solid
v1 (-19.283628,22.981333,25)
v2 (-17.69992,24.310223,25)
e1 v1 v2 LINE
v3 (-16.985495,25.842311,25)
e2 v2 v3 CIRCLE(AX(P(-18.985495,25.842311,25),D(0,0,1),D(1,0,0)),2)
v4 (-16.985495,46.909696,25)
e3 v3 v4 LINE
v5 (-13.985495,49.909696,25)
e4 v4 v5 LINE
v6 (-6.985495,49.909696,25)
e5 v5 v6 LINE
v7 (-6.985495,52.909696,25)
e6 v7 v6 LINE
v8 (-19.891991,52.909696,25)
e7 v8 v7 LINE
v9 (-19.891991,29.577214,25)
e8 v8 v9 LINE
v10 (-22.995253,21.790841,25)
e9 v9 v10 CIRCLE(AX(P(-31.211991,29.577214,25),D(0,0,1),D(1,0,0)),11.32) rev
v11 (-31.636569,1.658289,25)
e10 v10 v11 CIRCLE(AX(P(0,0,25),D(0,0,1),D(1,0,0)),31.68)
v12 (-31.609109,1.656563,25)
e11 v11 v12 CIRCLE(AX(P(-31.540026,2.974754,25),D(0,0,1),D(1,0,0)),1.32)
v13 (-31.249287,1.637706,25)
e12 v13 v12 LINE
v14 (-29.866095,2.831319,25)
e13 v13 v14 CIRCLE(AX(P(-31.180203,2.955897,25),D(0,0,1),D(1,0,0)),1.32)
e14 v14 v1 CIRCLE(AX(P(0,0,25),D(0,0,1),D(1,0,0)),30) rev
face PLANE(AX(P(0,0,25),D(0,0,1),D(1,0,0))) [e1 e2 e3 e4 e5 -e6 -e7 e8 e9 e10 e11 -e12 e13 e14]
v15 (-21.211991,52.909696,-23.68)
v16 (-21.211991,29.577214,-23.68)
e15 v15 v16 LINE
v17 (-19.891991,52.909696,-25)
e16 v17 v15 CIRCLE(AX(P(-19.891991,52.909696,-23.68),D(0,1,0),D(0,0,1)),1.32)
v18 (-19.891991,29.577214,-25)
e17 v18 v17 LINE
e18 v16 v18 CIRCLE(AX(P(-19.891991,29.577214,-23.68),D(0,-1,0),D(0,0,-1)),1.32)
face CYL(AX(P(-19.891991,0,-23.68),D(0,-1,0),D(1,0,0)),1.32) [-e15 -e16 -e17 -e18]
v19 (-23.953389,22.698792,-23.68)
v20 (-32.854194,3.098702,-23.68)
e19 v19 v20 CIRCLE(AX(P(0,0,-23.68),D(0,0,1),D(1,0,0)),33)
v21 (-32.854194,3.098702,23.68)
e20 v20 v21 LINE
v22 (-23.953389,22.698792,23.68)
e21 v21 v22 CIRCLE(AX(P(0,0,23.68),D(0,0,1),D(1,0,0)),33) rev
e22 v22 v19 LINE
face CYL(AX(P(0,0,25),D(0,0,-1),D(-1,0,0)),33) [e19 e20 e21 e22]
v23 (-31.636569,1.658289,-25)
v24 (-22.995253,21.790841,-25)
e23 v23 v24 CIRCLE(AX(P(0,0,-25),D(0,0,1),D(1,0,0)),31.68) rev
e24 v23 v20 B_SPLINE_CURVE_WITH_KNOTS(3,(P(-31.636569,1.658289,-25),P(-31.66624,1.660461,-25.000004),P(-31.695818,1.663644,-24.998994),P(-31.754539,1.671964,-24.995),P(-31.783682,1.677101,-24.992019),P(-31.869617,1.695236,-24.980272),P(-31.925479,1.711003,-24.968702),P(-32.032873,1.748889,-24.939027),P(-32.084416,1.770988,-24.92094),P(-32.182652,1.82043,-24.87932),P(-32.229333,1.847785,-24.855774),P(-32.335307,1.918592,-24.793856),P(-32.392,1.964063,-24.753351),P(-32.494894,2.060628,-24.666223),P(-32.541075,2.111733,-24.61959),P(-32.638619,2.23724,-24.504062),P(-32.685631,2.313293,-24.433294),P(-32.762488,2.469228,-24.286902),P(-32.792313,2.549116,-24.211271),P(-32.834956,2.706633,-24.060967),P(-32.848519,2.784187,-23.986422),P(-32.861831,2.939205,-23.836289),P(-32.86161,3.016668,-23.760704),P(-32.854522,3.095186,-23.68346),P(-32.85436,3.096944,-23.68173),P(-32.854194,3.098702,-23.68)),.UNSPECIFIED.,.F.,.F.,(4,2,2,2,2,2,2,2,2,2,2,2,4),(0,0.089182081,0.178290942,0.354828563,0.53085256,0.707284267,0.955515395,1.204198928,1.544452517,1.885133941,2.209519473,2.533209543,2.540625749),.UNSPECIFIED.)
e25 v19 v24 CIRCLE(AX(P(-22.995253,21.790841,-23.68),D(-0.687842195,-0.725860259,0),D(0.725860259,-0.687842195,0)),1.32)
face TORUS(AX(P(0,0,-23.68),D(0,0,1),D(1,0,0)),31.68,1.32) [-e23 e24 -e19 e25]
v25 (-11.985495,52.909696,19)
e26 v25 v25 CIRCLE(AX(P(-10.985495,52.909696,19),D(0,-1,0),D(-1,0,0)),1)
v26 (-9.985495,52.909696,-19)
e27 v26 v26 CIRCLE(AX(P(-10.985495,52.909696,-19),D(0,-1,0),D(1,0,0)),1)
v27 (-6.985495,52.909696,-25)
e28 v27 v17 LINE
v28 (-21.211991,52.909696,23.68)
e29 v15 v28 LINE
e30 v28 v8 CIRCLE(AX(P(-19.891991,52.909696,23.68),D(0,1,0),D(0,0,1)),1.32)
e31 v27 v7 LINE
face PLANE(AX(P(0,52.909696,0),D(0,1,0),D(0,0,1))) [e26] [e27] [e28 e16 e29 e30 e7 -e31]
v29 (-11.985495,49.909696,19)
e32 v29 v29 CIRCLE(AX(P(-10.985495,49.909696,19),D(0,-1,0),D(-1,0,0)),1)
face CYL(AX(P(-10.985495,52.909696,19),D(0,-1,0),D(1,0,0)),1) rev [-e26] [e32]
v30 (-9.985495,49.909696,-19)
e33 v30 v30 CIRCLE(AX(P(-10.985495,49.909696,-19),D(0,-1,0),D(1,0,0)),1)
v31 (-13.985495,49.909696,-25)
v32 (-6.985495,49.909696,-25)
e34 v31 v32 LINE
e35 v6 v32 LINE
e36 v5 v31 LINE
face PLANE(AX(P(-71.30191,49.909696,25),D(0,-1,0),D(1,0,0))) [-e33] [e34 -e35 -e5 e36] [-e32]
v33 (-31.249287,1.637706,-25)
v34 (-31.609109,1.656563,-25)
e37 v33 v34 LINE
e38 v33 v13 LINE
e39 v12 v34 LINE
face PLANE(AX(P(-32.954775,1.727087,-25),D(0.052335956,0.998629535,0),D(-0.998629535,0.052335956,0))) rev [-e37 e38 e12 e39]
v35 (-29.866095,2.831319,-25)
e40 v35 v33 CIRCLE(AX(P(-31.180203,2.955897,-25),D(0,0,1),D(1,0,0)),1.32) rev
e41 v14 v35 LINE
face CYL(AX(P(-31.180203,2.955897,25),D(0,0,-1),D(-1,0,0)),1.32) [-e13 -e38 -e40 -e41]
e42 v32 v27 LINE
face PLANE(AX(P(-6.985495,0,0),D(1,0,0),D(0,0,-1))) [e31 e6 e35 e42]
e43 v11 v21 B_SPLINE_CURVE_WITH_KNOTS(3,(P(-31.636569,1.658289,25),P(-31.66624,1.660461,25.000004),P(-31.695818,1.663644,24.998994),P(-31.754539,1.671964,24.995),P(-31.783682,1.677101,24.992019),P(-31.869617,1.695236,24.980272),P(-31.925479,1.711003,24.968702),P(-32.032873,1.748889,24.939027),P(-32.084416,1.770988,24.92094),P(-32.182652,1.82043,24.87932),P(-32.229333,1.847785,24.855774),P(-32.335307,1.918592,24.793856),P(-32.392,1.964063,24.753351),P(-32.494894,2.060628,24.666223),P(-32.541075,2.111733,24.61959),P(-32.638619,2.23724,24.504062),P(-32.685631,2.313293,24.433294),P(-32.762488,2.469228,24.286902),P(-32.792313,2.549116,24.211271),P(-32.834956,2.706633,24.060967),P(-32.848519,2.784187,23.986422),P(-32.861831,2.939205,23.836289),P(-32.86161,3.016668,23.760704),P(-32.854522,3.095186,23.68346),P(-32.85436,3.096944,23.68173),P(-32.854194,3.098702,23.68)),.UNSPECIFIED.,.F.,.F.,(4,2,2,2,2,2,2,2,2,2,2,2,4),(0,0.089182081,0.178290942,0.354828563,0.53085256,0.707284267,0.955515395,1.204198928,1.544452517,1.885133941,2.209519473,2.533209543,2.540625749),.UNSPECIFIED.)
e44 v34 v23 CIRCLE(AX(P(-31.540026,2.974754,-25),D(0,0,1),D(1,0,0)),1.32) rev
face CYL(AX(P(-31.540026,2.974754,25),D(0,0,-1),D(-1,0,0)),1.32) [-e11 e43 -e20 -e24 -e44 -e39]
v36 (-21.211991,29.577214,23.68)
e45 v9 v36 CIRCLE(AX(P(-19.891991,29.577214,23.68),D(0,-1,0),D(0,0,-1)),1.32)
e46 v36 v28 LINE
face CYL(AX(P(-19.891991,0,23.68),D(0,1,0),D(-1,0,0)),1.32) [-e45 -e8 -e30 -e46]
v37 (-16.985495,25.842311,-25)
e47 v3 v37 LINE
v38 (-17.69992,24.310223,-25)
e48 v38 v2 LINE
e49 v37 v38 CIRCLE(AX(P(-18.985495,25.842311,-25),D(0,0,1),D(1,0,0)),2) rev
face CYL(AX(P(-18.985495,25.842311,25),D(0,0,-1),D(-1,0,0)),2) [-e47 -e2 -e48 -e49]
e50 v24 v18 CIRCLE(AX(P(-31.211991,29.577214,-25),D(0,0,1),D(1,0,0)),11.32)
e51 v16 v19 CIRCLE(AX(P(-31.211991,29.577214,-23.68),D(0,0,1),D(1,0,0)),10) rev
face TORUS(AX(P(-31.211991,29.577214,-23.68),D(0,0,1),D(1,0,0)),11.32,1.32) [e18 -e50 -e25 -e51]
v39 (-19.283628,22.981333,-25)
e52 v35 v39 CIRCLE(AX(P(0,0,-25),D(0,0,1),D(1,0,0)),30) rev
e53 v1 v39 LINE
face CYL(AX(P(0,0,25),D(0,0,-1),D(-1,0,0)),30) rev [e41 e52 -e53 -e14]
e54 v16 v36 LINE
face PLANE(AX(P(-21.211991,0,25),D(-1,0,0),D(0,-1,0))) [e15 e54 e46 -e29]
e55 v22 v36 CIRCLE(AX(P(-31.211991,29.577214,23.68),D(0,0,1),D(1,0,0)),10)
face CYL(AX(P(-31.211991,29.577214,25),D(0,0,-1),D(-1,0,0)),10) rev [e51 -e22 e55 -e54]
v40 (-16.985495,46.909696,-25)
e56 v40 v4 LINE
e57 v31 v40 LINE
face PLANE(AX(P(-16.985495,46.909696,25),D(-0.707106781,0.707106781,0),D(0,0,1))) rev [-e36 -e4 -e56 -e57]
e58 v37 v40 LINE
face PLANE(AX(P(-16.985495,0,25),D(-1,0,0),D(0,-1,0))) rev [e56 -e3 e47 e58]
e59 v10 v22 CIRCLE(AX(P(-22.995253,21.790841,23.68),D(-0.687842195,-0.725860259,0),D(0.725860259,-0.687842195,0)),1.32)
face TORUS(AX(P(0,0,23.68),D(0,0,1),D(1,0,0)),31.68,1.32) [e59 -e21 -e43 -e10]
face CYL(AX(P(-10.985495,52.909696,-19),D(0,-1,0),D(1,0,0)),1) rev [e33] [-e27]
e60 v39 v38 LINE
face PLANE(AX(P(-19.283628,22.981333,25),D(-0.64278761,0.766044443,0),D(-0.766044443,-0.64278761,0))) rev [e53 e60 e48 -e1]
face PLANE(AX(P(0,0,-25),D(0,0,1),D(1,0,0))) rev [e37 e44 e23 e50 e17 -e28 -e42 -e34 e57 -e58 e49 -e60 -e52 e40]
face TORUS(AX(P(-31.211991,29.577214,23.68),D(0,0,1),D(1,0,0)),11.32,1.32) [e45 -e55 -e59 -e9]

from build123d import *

# Parameters (mm, degrees)
EXTRUDE_1_DEPTH             = 25
EXTRUDE_3_DEPTH             = 25
CUT_EXTRUDE_1_DEPTH         = 53.179559149
CUT_EXTRUDE_1_DEPTH_BACK    = 53.179559149
SKETCH_4_W                  = 32
SKETCH_4_H                  = 14.912747354
FILLET_1_R                  = 10
FILLET_17_R                 = 2
CUT_EXTRUDE_5_DEPTH         = 60.625850278
CUT_EXTRUDE_5_DEPTH_BACK    = 60.625850278
CUT_EXTRUDE_6_DEPTH         = 60.600832153
CUT_EXTRUDE_6_DEPTH_BACK    = 60.600832153
SKETCH_9_W                  = 7
SKETCH_9_H                  = 3
SKETCH_10_W                 = 4.226496159
SKETCH_10_H                 = 9
EXTRUDE_4_DEPTH             = 10
SKETCH_12_W                 = 50
SKETCH_12_H                 = 3
EXTRUDE_6_DEPTH             = 10
EXTRUDE_6_DIRECTION_2_REACH = 62.659
SKETCH_14_R                 = 1
CUT_EXTRUDE_8_DEPTH         = 64.621818473
FILLET_50_R                 = 1.32
SKETCH_16_W                 = 32
SKETCH_16_H                 = 21.912747354
EXTRUDE_7_DEPTH             = 4.226496158
EXTRUDE_START               = 32
EXTRUDE_8_DEPTH             = 32
CHAMFER_1_SIZE              = 3


with BuildPart() as part:
    # 草图1 → 凸台-拉伸1 (new, symmetric)
    with BuildSketch(Plane.XY):
        with BuildLine():
            ThreePointArc((-33, 0), (-29.908156972, 13.946402637), (-21.21199112, 25.279466623))
            Line((-21.21199112, 25.279466623), (-16.985494961, 24.909696123))
            Line((-16.985494961, 24.909696123), (-19.283628291, 22.981333294))
            ThreePointArc((-19.283628291, 22.981333294), (-27.189233611, 12.678547852), (-30, 0))
            Line((-30, 0), (-33, 0))
        make_face()
    extrude(amount=EXTRUDE_1_DEPTH, both=True)

    # 草图1<7> → 凸台-拉伸3 (add, symmetric)
    with BuildSketch(Plane.XY):
        Polygon((-21.21199112, 25.279466623), (-21.21199112, 39.909696123), (-28.21199112, 39.909696123), (-28.21199112, 42.909696123), (-16.985494961, 42.909696123), (-16.985494961, 39.909696123), (-16.985494961, 24.909696123), align=None)
    extrude(amount=EXTRUDE_3_DEPTH, both=True)

    # 草图4 → 切除-拉伸1 (cut, two sides: drawn at the far end of the back side and taken through both)
    with BuildSketch(Plane(origin=(-16.985494961, 0, 0), x_dir=(0, 0, -1), z_dir=(1, 0, 0)).offset(-CUT_EXTRUDE_1_DEPTH_BACK)):
        with Locations((0, 35.453322446)):
            Rectangle(SKETCH_4_W, SKETCH_4_H)
    extrude(amount=CUT_EXTRUDE_1_DEPTH + CUT_EXTRUDE_1_DEPTH_BACK, mode=Mode.SUBTRACT)

    # 圆角1
    # the kernel refuses this fillet: 10 mm, written as the material it adds along each edge
    with BuildSketch(Plane(origin=(-21.21199112, 25.279466623, 25), x_dir=(-0.7281290100330119, -0.6854401102564294, 0), z_dir=(0, 0, -1))) as fillet_1_piece_1_section:
        with BuildLine():
            CenterArc((4.335441405, 9.983715921), FILLET_1_R, 223.270229162, 43.459541677)
            Line((-2.945848695, 3.129314818), (0, 0))
            ThreePointArc((0, 0), (1.882494294, 0.053737462), (3.764988589, 0))
        make_face()
    fillet_1_piece_1 = extrude(amount=50, mode=Mode.PRIVATE)
    fillet_1_piece_1 = split(fillet_1_piece_1, bisect_by=Plane(origin=(-21.85438977, 25.398045646, 16), z_dir=(0, 0, 1)), keep=Keep.TOP, mode=Mode.PRIVATE)
    fillet_1_piece_1 = split(fillet_1_piece_1, bisect_by=Plane(origin=(-21.85438977, 27.996948769, 20.5), z_dir=(0, -1, 0)), keep=Keep.TOP, mode=Mode.PRIVATE)
    add(fillet_1_piece_1)
    with BuildSketch(Plane(origin=(-21.21199112, 25.279466623, 25), x_dir=(-0.7281290100330119, -0.6854401102564294, 0), z_dir=(0, 0, -1))) as fillet_1_piece_2_section:
        with BuildLine():
            CenterArc((4.335441405, 9.983715921), FILLET_1_R, 223.270229162, 43.459541677)
            Line((-2.945848695, 3.129314818), (0, 0))
            ThreePointArc((0, 0), (1.882494294, 0.053737462), (3.764988589, 0))
        make_face()
    fillet_1_piece_2 = extrude(amount=50, mode=Mode.PRIVATE)
    fillet_1_piece_2 = split(fillet_1_piece_2, bisect_by=Plane(origin=(-21.135777092, 28.718730095, 16), z_dir=(0, 0, 1)), keep=Keep.TOP, mode=Mode.PRIVATE)
    fillet_1_piece_2 = split(fillet_1_piece_2, bisect_by=Plane(origin=(-21.135777092, 27.996948769, 20.5), z_dir=(0, 1, 0)), keep=Keep.TOP, mode=Mode.PRIVATE)
    add(fillet_1_piece_2)
    with BuildSketch(Plane(origin=(-21.21199112, 25.279466623, 25), x_dir=(-0.7281290100330119, -0.6854401102564294, 0), z_dir=(0, 0, -1))) as fillet_1_piece_3_section:
        with BuildLine():
            CenterArc((4.335441405, 9.983715921), FILLET_1_R, 223.270229162, 43.459541677)
            Line((-2.945848695, 3.129314818), (0, 0))
            ThreePointArc((0, 0), (1.882494294, 0.053737462), (3.764988589, 0))
        make_face()
    fillet_1_piece_3 = extrude(amount=50, mode=Mode.PRIVATE)
    fillet_1_piece_3 = split(fillet_1_piece_3, bisect_by=Plane(origin=(-21.85438977, 25.398045646, 16), z_dir=(0, 0, -1)), keep=Keep.TOP, mode=Mode.PRIVATE)
    fillet_1_piece_3 = split(fillet_1_piece_3, bisect_by=Plane(origin=(-21.85438977, 27.996948769, 0), z_dir=(0, -1, 0)), keep=Keep.TOP, mode=Mode.PRIVATE)
    fillet_1_piece_3 = split(fillet_1_piece_3, bisect_by=Plane(origin=(-21.85438977, 25.398045646, -16), z_dir=(0, 0, 1)), keep=Keep.TOP, mode=Mode.PRIVATE)
    add(fillet_1_piece_3)
    with BuildSketch(Plane(origin=(-21.21199112, 25.279466623, 25), x_dir=(-0.7281290100330119, -0.6854401102564294, 0), z_dir=(0, 0, -1))) as fillet_1_piece_4_section:
        with BuildLine():
            CenterArc((4.335441405, 9.983715921), FILLET_1_R, 223.270229162, 43.459541677)
            Line((-2.945848695, 3.129314818), (0, 0))
            ThreePointArc((0, 0), (1.882494294, 0.053737462), (3.764988589, 0))
        make_face()
    fillet_1_piece_4 = extrude(amount=50, mode=Mode.PRIVATE)
    fillet_1_piece_4 = split(fillet_1_piece_4, bisect_by=Plane(origin=(-21.85438977, 27.996948769, -20.5), z_dir=(0, -1, 0)), keep=Keep.TOP, mode=Mode.PRIVATE)
    fillet_1_piece_4 = split(fillet_1_piece_4, bisect_by=Plane(origin=(-21.85438977, 25.398045646, -16), z_dir=(0, 0, -1)), keep=Keep.TOP, mode=Mode.PRIVATE)
    add(fillet_1_piece_4)
    with BuildSketch(Plane(origin=(-21.21199112, 25.279466623, 25), x_dir=(-0.7281290100330119, -0.6854401102564294, 0), z_dir=(0, 0, -1))) as fillet_1_piece_5_section:
        with BuildLine():
            CenterArc((4.335441405, 9.983715921), FILLET_1_R, 223.270229162, 43.459541677)
            Line((-2.945848695, 3.129314818), (0, 0))
            ThreePointArc((0, 0), (1.882494294, 0.053737462), (3.764988589, 0))
        make_face()
    fillet_1_piece_5 = extrude(amount=50, mode=Mode.PRIVATE)
    fillet_1_piece_5 = split(fillet_1_piece_5, bisect_by=Plane(origin=(-21.135777092, 27.996948769, -20.5), z_dir=(0, 1, 0)), keep=Keep.TOP, mode=Mode.PRIVATE)
    fillet_1_piece_5 = split(fillet_1_piece_5, bisect_by=Plane(origin=(-21.135777092, 28.718730095, -16), z_dir=(0, 0, -1)), keep=Keep.TOP, mode=Mode.PRIVATE)
    add(fillet_1_piece_5)

    # 圆角17
    fillet_17_edges = [part.edges().sort_by_distance(p)[0] for p in [
        (-16.985494961, 24.909696123, 0),
    ]]
    fillet(fillet_17_edges, radius=FILLET_17_R)

    # 草图7 → 切除-拉伸5 (cut, two sides: drawn at the far end of the back side and taken through both)
    with BuildSketch(Plane.XY.offset(-CUT_EXTRUDE_5_DEPTH_BACK)):
        with BuildLine():
            Line((0, 0), (-33, 0))
            ThreePointArc((-33, 0), (-32.988691724, 0.863839294), (-32.954774647, 1.727086556))
            Line((-32.954774647, 1.727086556), (0, 0))
        make_face()
    extrude(amount=CUT_EXTRUDE_5_DEPTH + CUT_EXTRUDE_5_DEPTH_BACK, mode=Mode.SUBTRACT)

    # 草图9 → 切除-拉伸6 (cut, two sides: drawn at the far end of the back side and taken through both)
    with BuildSketch(Plane.XY.offset(-CUT_EXTRUDE_6_DEPTH_BACK)):
        with Locations((-24.71199112, 41.409696123)):
            Rectangle(SKETCH_9_W, SKETCH_9_H)
    extrude(amount=CUT_EXTRUDE_6_DEPTH + CUT_EXTRUDE_6_DEPTH_BACK, mode=Mode.SUBTRACT)

    # 草图10 → 凸台-拉伸4 (add)
    with BuildSketch(Plane(origin=(0, 42.909696123, 0), x_dir=(1, 0, 0), z_dir=(0, 1, 0))):
        with Locations((-19.098743041, 20.5)):
            Rectangle(SKETCH_10_W, SKETCH_10_H)
        with Locations((-19.098743041, -20.5)):
            Rectangle(SKETCH_10_W, SKETCH_10_H)
    extrude(amount=EXTRUDE_4_DEPTH)

    # 草图12 → 凸台-拉伸6 (add)
    with BuildSketch(Plane(origin=(-16.985494961, 0, 0), x_dir=(0, 0, -1), z_dir=(1, 0, 0))):
        with Locations((0, 51.409696123)):
            Rectangle(SKETCH_12_W, SKETCH_12_H)
    extrude(amount=EXTRUDE_6_DEPTH)

    # 凸台-拉伸6 direction 2: up to this face of the body (flat: up to its plane)
    extrude_6_direction_2_end = Plane(part.part.faces().sort_by_distance((-21.21199112, 41.24345525, 20.5))[0])
    # 草图12 → 凸台-拉伸6 direction 2 (add, up to the picked face)
    with BuildSketch(Plane(origin=(-16.985494961, 0, 0), x_dir=(0, 0, -1), z_dir=(1, 0, 0)), mode=Mode.PRIVATE) as extrude_6_direction_2_sk1:
        with Locations((0, 51.409696123)):
            Rectangle(SKETCH_12_W, SKETCH_12_H)
    extrude_6_direction_2_tool1 = split(extrude(extrude_6_direction_2_sk1.sketch, amount=-EXTRUDE_6_DIRECTION_2_REACH, mode=Mode.PRIVATE), bisect_by=extrude_6_direction_2_end, keep=Keep.BOTH, mode=Mode.PRIVATE)
    add(extrude_6_direction_2_tool1.solids().sort_by(Axis((-16.985495, 51.409696, 0), (-1, 0, 0)))[0])

    # 草图14 → 切除-拉伸8 (cut, through all)
    with BuildSketch(Plane(origin=(0, 49.909696123, 0), x_dir=(-1, 0, 0), z_dir=(0, -1, 0))):
        with Locations(Location((10.985494961, 19, 0), (0, 0, 180))):
            Circle(SKETCH_14_R)
        with Locations((10.985494961, -19)):
            Circle(SKETCH_14_R)
    extrude(amount=-CUT_EXTRUDE_8_DEPTH, mode=Mode.SUBTRACT)

    # 圆角50
    fillet_50_edges = [part.edges().sort_by_distance(p)[0] for p in [
        (-21.21199112, 41.24345525, -25),
        (-21.21199112, 41.24345525, 25),
        (-21.922587859, 25.874919539, -25),
        (-21.922587859, 25.874919539, 25),
        (-30.324707269, 13.015841465, -25),
        (-30.324707269, 13.015841465, 25),
        (-29.958886043, 1.570078687, 0),
        (-32.954774647, 1.727086556, 0),
    ]]
    fillet(fillet_50_edges, radius=FILLET_50_R)

    # 草图16 → 凸台-拉伸7 (add)
    with BuildSketch(Plane(origin=(-16.985494961, 0, 0), x_dir=(0, 0, -1), z_dir=(1, 0, 0))):
        with Locations((0, 38.953322446)):
            Rectangle(SKETCH_16_W, SKETCH_16_H)
    extrude(amount=-EXTRUDE_7_DEPTH)

    # 草图17 → 凸台-拉伸8 (add)
    with BuildSketch(Plane.XY.offset(-16).offset(EXTRUDE_START)):
        with BuildLine():
            Line((-21.337642503, 27.996948769), (-21.21199112, 27.996948769))
            Line((-21.21199112, 27.996948769), (-21.21199112, 29.577214378))
            ThreePointArc((-21.21199112, 29.577214378), (-21.243453459, 28.784587785), (-21.337642503, 27.996948769))
        make_face()
    extrude(amount=-EXTRUDE_8_DEPTH)

    # 倒角1
    chamfer_1_edges = [part.edges().sort_by_distance(p)[0] for p in [
        (-16.985494961, 49.909696123, 0),
    ]]
    chamfer(chamfer_1_edges, length=CHAMFER_1_SIZE)


solid = part.part
